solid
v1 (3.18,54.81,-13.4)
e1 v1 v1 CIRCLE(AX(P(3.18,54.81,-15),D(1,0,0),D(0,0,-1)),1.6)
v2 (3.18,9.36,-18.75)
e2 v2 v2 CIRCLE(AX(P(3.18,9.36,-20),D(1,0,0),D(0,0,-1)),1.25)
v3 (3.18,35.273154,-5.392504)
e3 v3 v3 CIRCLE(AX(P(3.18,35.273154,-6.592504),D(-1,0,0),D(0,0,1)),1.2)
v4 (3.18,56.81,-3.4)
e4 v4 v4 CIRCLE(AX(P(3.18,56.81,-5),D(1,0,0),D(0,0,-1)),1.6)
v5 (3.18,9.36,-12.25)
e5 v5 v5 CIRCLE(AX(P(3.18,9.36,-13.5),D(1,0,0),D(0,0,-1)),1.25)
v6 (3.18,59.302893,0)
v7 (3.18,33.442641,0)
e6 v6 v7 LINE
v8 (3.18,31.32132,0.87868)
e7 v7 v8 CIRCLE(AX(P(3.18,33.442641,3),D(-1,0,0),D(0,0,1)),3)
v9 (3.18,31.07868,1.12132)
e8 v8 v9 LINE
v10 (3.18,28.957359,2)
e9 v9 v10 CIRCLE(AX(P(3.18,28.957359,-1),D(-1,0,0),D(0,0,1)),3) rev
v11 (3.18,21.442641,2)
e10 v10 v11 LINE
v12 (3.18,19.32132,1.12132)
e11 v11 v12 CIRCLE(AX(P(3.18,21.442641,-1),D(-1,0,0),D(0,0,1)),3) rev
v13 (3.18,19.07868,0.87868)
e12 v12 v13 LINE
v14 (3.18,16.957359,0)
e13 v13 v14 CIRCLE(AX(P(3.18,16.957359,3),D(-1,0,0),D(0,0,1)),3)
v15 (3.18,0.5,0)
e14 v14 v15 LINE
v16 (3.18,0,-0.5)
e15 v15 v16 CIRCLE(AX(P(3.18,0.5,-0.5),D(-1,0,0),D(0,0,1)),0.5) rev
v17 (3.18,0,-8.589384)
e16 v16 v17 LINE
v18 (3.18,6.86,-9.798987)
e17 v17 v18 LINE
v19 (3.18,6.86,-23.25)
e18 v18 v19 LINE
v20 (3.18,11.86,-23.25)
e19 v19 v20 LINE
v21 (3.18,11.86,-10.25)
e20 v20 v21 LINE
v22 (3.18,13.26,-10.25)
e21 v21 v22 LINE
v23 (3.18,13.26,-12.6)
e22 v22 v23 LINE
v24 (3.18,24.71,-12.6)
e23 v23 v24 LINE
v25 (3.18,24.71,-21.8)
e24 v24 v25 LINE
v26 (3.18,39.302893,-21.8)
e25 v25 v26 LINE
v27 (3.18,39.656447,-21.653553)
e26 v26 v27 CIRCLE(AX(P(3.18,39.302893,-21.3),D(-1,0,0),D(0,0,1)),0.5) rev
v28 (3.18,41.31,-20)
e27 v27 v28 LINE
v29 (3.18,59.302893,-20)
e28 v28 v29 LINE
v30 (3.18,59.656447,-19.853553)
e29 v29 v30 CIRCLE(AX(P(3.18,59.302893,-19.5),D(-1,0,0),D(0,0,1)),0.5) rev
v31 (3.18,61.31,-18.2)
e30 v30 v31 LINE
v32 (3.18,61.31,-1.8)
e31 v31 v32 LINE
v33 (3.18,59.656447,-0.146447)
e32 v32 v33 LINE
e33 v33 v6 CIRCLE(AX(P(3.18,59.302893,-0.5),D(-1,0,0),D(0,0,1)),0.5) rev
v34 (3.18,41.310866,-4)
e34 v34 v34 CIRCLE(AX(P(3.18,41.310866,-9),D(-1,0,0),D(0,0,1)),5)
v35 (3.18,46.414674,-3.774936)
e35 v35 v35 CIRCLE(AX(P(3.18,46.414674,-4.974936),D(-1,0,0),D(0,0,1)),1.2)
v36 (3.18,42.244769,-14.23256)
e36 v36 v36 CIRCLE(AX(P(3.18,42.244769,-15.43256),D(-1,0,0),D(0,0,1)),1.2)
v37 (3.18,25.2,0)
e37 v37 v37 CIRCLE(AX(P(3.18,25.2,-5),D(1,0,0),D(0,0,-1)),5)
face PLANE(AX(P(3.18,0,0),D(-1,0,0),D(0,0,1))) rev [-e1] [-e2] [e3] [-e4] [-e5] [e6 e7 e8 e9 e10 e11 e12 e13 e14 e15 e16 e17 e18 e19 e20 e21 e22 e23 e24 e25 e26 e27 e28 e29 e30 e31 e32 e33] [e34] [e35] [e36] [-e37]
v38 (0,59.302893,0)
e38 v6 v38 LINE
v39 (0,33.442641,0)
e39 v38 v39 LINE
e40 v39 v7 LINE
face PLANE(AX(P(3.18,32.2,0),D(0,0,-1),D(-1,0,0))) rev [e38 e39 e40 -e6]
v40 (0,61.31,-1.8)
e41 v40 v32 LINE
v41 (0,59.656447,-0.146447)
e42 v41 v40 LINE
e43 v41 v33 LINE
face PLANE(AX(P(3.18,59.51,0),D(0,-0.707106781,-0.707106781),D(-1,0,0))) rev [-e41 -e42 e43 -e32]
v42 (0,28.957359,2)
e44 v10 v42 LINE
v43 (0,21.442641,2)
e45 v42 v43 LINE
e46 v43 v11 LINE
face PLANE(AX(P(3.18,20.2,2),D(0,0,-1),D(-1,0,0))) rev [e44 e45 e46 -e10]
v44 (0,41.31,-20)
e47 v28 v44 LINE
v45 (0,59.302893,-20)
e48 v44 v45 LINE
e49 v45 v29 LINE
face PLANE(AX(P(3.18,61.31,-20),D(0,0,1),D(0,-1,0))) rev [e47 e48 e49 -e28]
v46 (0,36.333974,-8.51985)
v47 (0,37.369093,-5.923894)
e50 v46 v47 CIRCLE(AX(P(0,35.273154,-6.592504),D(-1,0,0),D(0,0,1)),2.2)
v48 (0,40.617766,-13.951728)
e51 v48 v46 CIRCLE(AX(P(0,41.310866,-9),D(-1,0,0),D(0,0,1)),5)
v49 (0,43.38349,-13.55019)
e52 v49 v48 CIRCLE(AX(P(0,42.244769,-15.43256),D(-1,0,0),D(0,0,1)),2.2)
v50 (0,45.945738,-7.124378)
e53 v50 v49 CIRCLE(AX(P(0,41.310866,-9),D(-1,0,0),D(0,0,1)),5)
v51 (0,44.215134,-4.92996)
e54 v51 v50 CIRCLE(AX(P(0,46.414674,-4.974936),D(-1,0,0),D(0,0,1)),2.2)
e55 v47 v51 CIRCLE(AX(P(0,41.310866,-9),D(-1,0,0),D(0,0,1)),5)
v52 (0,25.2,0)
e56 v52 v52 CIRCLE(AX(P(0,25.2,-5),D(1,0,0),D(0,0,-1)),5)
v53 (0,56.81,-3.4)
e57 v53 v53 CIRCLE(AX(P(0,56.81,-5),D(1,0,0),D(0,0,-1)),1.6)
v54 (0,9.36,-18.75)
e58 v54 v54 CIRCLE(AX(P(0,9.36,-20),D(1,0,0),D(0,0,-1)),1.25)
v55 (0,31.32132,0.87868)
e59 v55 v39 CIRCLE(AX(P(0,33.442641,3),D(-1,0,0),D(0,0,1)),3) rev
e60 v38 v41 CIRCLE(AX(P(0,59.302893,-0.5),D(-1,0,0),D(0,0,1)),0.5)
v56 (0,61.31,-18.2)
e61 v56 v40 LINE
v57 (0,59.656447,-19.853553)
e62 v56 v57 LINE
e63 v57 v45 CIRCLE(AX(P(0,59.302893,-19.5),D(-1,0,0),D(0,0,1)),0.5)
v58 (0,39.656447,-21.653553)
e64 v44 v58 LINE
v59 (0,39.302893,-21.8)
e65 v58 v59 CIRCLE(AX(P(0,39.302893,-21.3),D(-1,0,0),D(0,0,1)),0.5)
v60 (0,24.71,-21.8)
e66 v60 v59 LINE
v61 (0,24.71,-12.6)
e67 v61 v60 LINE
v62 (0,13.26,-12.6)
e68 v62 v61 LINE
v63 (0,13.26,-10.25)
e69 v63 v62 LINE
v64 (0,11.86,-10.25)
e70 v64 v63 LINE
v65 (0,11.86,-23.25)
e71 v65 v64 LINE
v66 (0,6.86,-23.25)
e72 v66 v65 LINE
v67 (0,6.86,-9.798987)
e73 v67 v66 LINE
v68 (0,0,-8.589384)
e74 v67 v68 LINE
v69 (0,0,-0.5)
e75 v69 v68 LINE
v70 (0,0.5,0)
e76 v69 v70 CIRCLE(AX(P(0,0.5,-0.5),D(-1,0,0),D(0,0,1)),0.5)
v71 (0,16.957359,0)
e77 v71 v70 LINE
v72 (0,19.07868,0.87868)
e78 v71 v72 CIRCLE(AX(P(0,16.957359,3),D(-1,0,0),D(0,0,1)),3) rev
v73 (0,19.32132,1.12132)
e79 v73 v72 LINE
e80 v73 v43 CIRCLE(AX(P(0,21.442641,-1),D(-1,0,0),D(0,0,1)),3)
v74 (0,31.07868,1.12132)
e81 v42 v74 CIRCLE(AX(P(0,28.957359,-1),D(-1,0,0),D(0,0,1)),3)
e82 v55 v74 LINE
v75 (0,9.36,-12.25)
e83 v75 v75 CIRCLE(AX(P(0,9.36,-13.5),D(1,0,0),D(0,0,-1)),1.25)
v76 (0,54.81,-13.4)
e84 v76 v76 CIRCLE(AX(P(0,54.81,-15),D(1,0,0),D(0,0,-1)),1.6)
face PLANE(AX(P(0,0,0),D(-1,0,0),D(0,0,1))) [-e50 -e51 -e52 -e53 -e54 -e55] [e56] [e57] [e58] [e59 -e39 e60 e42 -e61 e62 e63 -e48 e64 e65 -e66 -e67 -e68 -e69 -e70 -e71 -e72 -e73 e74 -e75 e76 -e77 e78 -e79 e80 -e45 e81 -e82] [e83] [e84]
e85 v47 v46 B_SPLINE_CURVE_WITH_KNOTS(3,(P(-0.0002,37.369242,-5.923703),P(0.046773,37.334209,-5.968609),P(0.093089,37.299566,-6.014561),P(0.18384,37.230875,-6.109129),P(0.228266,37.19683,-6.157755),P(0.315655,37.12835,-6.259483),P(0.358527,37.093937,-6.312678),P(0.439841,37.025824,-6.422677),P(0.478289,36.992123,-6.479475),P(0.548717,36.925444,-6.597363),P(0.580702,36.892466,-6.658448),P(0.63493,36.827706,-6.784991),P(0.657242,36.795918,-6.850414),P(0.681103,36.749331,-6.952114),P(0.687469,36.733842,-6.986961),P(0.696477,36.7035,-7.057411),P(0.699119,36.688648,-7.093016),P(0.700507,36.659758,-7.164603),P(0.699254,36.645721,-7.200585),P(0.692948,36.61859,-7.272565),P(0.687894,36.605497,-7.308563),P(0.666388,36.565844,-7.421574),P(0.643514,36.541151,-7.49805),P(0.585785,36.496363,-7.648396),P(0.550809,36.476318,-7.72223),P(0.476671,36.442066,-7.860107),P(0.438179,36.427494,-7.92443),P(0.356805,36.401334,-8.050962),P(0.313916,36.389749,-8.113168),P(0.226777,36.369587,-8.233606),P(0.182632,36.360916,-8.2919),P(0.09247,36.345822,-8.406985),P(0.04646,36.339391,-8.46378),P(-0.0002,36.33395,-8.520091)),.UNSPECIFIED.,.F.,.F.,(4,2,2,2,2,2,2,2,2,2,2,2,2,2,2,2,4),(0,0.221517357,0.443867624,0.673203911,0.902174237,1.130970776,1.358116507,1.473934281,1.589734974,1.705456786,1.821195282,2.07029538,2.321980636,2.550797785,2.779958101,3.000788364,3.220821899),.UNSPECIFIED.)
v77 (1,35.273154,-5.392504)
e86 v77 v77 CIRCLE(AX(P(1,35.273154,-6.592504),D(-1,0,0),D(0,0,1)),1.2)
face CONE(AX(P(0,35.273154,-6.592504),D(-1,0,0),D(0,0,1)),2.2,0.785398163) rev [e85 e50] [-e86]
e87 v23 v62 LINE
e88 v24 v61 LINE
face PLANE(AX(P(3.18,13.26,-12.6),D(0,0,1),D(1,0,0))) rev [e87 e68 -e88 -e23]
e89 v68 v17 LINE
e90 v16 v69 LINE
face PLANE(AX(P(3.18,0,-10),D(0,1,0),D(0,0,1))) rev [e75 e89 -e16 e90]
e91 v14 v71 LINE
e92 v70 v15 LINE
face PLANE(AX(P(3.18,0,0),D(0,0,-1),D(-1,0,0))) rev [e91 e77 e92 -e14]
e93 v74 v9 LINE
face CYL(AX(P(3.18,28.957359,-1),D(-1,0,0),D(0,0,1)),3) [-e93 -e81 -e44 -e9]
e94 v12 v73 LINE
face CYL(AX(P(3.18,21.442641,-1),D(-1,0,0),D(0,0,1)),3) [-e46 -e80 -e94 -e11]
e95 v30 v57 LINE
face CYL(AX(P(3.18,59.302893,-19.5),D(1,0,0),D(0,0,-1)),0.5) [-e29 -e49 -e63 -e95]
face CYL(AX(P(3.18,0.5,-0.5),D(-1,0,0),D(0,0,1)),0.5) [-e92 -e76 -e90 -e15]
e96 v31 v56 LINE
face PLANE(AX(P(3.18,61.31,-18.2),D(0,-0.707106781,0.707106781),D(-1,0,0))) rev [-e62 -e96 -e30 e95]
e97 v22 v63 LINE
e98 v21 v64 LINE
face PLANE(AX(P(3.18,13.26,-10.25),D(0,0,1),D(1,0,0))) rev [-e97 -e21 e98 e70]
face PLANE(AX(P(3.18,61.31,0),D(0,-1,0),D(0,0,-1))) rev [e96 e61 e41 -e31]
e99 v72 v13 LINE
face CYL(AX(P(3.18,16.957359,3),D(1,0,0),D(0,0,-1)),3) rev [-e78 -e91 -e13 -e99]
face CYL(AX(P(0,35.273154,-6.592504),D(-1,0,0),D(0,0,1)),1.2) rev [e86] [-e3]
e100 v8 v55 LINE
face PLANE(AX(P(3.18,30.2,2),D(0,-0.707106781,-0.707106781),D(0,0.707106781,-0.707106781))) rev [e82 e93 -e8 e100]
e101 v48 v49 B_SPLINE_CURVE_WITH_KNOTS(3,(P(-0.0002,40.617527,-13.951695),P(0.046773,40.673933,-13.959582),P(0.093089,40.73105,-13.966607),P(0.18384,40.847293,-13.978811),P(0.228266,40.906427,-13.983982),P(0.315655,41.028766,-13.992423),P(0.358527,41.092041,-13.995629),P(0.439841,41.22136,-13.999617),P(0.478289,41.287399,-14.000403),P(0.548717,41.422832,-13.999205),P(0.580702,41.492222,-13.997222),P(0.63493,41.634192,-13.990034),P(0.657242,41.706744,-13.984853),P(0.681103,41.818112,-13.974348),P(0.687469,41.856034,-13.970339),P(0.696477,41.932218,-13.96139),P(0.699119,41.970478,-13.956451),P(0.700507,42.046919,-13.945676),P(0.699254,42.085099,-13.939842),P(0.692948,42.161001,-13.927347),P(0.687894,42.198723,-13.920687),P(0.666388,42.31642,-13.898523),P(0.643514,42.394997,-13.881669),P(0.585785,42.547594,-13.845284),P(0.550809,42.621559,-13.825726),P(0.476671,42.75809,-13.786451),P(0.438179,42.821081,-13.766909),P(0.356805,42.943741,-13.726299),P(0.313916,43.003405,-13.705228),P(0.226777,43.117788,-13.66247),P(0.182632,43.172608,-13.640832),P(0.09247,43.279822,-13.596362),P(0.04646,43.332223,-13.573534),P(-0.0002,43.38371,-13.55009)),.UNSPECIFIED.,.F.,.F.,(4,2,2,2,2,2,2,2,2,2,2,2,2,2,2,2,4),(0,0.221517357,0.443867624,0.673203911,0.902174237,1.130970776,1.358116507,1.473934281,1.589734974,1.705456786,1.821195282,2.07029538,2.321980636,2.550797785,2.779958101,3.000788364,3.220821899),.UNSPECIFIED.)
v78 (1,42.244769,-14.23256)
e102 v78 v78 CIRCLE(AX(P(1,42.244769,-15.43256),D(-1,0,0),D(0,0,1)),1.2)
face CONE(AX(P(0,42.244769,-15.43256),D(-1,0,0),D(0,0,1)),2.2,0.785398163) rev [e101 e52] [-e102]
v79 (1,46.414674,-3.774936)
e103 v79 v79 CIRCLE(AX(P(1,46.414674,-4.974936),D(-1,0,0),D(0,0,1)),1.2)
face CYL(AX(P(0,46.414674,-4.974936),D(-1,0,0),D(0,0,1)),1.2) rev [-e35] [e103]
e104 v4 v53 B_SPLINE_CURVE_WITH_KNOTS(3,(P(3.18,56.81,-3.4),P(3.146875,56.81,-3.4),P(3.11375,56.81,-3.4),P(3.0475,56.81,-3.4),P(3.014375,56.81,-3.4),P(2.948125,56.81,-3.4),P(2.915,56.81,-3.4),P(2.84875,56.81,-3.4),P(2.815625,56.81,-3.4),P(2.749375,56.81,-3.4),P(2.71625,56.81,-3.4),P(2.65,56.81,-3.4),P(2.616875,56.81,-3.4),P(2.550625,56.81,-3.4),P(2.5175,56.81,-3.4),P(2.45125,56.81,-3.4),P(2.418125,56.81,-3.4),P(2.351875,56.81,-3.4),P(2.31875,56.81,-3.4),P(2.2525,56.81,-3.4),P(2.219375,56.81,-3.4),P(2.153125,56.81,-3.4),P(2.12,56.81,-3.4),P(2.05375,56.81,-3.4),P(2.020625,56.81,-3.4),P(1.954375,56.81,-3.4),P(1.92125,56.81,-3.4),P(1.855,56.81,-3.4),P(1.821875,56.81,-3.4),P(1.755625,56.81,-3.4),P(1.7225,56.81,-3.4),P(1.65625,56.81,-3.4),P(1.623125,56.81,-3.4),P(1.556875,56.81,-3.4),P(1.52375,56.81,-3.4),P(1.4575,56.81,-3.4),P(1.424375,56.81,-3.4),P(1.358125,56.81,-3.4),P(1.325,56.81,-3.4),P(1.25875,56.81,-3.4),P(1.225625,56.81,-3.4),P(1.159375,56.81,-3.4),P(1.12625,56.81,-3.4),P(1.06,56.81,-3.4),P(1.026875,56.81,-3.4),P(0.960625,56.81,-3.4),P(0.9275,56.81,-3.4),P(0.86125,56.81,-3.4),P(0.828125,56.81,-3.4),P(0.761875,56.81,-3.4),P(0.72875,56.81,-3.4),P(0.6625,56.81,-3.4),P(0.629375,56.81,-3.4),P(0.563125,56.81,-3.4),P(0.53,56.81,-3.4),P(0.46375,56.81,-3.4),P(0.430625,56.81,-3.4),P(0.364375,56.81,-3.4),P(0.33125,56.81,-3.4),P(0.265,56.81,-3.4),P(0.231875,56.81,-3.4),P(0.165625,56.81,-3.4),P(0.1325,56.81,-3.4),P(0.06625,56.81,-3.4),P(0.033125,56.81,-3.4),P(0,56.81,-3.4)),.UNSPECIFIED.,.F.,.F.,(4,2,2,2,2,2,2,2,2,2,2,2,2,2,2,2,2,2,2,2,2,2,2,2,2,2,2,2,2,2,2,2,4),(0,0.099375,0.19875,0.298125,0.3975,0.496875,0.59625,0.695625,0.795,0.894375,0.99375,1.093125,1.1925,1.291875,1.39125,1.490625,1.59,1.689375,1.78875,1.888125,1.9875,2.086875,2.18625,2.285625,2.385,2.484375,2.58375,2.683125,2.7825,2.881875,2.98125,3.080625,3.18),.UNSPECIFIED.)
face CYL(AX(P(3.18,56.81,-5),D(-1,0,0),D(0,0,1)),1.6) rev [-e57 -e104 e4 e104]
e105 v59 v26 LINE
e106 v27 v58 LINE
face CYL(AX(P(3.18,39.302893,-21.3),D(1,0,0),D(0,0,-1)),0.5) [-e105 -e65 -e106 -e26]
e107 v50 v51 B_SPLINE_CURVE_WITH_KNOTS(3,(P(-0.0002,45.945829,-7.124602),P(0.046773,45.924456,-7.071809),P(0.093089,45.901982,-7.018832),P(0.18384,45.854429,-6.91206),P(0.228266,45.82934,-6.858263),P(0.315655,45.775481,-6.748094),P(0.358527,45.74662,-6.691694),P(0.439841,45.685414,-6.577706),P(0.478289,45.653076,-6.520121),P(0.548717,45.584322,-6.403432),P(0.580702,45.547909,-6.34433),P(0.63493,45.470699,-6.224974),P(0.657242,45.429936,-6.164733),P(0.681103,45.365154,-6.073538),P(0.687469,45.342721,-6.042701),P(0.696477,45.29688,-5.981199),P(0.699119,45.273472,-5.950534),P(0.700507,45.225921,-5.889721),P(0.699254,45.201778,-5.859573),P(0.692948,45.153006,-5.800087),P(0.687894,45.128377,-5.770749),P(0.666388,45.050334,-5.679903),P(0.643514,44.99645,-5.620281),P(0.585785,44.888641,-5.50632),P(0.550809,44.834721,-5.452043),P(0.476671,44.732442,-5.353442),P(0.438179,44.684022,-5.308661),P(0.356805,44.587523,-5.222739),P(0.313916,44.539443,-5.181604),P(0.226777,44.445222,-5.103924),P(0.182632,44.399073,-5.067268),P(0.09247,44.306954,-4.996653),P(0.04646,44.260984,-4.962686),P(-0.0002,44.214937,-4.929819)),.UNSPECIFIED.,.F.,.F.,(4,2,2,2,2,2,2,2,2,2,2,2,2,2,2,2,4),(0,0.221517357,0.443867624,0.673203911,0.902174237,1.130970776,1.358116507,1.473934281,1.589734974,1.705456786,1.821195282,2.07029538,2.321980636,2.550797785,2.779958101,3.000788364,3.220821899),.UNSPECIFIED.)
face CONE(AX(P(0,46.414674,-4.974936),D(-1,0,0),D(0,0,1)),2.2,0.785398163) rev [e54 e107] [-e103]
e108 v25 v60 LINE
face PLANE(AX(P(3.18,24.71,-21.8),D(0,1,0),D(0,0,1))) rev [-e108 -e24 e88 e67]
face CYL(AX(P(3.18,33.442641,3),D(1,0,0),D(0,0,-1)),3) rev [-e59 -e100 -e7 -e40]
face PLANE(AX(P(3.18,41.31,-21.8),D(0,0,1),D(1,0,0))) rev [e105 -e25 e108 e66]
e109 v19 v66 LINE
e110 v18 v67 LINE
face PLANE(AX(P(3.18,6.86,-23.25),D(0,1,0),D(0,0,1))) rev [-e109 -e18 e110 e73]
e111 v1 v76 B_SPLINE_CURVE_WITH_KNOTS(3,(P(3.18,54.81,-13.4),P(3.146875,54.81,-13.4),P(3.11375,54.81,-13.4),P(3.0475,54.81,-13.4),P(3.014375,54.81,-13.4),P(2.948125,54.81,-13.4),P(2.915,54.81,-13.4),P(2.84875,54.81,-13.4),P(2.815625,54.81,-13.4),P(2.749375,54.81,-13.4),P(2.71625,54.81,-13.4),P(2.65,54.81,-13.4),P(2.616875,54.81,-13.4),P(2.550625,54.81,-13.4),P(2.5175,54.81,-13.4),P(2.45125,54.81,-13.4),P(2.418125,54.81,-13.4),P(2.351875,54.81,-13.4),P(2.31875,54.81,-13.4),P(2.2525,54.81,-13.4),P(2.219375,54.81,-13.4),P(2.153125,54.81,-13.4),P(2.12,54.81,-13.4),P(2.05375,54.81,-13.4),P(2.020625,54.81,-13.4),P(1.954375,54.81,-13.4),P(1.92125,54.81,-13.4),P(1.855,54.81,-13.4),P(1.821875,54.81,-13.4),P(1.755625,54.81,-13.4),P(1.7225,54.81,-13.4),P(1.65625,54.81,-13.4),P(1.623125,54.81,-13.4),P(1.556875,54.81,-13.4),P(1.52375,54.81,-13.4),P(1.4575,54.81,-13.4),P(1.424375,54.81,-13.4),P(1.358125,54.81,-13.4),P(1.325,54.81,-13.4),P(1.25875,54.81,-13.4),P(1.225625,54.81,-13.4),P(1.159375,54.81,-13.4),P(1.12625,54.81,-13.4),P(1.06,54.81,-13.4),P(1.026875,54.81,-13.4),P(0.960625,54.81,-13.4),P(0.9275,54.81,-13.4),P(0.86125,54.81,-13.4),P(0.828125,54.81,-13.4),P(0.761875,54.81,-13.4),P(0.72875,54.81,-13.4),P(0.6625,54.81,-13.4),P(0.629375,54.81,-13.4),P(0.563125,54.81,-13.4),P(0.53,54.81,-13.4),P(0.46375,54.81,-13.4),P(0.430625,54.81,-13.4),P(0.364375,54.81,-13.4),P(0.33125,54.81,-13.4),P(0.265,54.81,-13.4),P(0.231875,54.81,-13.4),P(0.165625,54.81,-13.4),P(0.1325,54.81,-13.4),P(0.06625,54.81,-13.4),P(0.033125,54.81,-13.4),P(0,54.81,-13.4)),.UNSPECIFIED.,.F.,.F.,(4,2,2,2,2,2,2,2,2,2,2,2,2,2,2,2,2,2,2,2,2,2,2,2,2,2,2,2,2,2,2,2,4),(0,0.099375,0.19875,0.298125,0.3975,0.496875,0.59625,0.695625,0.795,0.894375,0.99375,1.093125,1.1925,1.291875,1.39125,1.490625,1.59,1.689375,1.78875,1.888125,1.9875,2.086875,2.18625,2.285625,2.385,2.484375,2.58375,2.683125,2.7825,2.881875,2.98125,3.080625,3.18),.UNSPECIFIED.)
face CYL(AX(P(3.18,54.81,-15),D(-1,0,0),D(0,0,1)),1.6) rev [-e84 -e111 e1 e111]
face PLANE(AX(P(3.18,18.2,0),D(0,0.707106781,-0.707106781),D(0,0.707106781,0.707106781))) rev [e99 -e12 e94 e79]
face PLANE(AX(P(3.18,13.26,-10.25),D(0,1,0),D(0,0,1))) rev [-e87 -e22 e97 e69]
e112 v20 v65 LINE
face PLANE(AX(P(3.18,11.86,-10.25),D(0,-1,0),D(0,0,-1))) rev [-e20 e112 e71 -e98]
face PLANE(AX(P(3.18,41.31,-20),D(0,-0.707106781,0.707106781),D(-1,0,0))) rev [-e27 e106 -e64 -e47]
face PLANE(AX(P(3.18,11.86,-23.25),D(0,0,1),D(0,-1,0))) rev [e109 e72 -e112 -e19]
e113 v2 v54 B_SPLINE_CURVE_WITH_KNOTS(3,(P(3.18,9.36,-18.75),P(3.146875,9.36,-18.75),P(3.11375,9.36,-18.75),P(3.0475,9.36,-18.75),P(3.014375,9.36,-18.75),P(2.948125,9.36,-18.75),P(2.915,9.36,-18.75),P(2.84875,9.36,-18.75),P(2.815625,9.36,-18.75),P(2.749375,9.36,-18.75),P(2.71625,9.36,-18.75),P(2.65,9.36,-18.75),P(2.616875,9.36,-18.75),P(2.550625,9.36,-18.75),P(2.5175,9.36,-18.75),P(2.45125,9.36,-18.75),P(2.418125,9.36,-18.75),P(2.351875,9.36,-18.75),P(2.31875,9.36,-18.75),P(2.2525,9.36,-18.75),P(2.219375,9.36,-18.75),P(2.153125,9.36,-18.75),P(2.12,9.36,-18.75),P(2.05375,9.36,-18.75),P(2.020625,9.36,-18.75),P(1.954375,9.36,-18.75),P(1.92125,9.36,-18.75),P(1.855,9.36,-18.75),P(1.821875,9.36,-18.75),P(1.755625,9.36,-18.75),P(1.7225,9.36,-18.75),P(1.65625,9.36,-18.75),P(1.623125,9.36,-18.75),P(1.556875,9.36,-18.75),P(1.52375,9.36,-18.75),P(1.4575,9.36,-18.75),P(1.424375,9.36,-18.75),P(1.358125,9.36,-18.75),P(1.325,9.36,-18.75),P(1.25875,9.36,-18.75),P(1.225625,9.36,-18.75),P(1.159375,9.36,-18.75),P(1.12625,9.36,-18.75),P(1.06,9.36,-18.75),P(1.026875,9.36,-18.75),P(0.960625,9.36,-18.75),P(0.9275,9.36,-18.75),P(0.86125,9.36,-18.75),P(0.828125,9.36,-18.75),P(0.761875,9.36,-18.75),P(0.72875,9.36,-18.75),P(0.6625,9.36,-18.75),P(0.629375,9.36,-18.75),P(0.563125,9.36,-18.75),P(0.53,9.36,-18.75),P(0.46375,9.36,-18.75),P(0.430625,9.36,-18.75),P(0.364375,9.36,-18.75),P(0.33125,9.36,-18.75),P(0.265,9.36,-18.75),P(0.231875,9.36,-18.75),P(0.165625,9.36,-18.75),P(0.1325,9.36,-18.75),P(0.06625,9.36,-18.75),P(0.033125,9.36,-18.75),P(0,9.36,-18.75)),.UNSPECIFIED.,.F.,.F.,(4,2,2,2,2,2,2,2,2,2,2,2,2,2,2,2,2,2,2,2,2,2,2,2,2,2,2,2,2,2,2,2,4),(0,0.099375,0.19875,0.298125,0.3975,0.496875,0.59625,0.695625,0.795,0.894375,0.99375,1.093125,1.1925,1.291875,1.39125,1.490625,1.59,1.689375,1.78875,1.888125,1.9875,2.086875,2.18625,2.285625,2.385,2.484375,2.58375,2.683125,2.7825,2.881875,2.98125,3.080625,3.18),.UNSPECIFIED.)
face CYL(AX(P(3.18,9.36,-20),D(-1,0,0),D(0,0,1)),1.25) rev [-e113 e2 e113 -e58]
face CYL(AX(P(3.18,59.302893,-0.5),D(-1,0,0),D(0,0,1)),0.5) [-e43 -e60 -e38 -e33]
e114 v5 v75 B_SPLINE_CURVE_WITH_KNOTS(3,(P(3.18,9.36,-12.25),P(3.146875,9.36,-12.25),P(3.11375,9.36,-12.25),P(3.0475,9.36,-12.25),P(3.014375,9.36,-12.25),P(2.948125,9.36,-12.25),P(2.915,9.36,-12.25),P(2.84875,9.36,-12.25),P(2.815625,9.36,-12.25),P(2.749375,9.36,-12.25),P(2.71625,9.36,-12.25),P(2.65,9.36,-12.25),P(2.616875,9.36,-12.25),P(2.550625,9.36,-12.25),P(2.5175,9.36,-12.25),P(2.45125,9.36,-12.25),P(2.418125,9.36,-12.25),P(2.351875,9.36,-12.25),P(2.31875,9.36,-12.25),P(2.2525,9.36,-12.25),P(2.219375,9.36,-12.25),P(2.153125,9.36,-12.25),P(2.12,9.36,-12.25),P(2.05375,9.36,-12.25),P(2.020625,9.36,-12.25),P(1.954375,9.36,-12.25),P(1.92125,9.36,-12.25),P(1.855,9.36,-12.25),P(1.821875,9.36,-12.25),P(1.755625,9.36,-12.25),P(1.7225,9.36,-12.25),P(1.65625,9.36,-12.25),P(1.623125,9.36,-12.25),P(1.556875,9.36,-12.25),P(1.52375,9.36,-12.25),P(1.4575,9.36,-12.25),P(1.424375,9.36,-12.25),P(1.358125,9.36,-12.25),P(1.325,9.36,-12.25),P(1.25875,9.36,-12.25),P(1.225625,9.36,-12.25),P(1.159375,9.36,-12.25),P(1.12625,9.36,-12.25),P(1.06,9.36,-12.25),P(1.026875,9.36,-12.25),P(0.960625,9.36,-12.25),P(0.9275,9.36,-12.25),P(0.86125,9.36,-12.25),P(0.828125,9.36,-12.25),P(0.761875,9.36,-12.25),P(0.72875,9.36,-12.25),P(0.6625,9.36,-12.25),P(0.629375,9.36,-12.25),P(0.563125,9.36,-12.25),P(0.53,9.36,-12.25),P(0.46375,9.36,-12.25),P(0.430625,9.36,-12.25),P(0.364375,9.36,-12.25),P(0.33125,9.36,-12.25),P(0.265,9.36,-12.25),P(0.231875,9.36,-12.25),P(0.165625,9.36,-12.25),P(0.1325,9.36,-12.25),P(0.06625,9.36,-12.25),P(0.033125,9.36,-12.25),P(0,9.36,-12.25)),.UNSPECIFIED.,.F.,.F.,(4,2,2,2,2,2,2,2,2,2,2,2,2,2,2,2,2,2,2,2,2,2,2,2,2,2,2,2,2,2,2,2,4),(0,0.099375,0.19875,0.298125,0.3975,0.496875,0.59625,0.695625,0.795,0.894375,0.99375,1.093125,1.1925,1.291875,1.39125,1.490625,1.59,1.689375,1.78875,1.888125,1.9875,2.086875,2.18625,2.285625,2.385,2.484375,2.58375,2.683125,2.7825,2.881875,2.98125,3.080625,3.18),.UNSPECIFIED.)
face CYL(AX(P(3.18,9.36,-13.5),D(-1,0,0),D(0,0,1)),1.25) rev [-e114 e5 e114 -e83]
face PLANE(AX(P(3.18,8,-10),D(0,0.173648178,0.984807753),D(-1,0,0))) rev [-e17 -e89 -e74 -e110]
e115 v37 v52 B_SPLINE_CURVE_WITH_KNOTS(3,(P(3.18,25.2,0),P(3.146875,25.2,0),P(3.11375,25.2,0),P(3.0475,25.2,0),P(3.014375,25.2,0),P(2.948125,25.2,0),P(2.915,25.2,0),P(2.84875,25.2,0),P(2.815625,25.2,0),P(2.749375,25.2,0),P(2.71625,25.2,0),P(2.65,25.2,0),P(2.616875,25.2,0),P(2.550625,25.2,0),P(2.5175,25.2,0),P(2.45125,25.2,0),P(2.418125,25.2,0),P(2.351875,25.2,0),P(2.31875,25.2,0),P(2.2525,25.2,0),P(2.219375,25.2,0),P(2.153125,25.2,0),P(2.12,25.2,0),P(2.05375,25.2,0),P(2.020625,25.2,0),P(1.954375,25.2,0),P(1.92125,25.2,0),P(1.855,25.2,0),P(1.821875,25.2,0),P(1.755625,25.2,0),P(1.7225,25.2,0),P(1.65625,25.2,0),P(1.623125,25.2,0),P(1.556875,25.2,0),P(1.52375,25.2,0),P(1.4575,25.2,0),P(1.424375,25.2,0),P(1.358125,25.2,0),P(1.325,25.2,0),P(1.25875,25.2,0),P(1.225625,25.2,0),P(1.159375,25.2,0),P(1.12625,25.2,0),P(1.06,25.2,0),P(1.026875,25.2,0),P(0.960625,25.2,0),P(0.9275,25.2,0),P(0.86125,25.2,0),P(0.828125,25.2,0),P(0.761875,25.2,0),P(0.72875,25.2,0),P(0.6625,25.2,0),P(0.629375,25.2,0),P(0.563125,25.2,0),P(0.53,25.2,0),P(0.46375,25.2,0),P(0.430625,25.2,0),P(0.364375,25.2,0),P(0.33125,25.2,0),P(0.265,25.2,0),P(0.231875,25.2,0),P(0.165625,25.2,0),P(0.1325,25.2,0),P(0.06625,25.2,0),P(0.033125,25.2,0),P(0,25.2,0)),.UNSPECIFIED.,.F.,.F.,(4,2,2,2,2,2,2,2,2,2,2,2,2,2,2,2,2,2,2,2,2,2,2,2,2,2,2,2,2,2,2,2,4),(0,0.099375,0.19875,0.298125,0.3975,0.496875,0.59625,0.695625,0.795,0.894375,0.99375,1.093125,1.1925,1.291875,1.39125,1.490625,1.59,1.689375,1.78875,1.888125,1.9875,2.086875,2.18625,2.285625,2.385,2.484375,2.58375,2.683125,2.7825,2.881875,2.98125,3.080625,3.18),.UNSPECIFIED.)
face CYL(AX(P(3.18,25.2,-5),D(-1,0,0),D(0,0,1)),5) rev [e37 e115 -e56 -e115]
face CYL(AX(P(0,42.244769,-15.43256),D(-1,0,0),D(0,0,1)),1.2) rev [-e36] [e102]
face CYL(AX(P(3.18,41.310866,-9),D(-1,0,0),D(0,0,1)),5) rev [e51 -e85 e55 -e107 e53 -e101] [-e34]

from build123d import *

# Parameters (mm, degrees)
SKETCH1_R                                       = 5
SKETCH1_R_2                                     = 1.6
SKETCH1_R_3                                     = 1.25
BOSS_EXTRUDE1_DEPTH                             = 3.18
CHAMFER1_SIZE                                   = 8
CHAMFER1_SIZE_2                                 = 1.410615846
CSK_FOR_M2_FLAT_HEAD_MACHINE_SCREW1_D           = 2.4
CSK_FOR_M2_FLAT_HEAD_MACHINE_SCREW1_DEPTH       = 3.508967257
CSK_FOR_M2_FLAT_HEAD_MACHINE_SCREW1_CSINK_D     = 4.4
CSK_FOR_M2_FLAT_HEAD_MACHINE_SCREW1_CSINK_ANGLE = 90
CSK_FOR_M2_FLAT_HEAD_MACHINE_SCREW1_TIP         = 0.721032743
SKETCH3_R                                       = 5
CUT_EXTRUDE4_DEPTH                              = 66.647475199
FILLET2_R                                       = 3
CHAMFER2_SIZE                                   = 1.8
FILLET4_R                                       = 0.5


# Some blends are built 0.0001 mm under size
with BuildPart() as part:
    # Sketch1 → Boss-Extrude1 (new body)
    with BuildSketch(Plane(origin=(0, 0, 0), x_dir=(0, 0, -1), z_dir=(1, 0, 0))):
        Polygon((0, 0), (0, 18.2), (-2, 20.2), (-2, 30.2), (0, 32.2), (0, 61.31), (20, 61.31), (20, 41.31), (21.8, 41.31), (21.8, 24.71), (12.6, 24.71), (12.6, 13.26), (10.25, 13.26), (10.25, 11.86), (23.25, 11.86), (23.25, 6.86), (10, 6.86), (10, 0), align=None)
        with Locations(Location((5, 25.2, 0), (0, 0, 180))):
            Circle(SKETCH1_R, mode=Mode.SUBTRACT)
        with Locations(Location((5, 56.81, 0), (0, 0, 180))):
            Circle(SKETCH1_R_2, mode=Mode.SUBTRACT)
        with Locations(Location((15, 54.81, 0), (0, 0, 180))):
            Circle(SKETCH1_R_2, mode=Mode.SUBTRACT)
        with Locations(Location((20, 9.36, 0), (0, 0, 180))):
            Circle(SKETCH1_R_3, mode=Mode.SUBTRACT)
        with Locations(Location((13.5, 9.36, 0), (0, 0, 180))):
            Circle(SKETCH1_R_3, mode=Mode.SUBTRACT)
    extrude(amount=BOSS_EXTRUDE1_DEPTH)

    # Chamfer1
    # the kernel refuses this chamfer: 8, 1.410615846 mm, written as the material it takes off along each edge
    with BuildSketch(Plane(origin=(-20.788310371, 0, -10), x_dir=(0, 0.9999776716360547, -0.006682531656101032), z_dir=(1, 0, 0))) as chamfer1_piece_1_section:
        Polygon((CHAMFER1_SIZE * 0.999977671636, CHAMFER1_SIZE * 0.0066825316561), (-CHAMFER1_SIZE_2 * 0.00668253165453, CHAMFER1_SIZE_2 * 0.999977671401), (0, 0), align=None)
    chamfer1_piece_1 = extrude(amount=44.756620743, mode=Mode.PRIVATE)
    chamfer1_piece_1 = split(chamfer1_piece_1, bisect_by=Plane(origin=(1.59, 6.86, -9.594110318), z_dir=(0, -1, 0)), keep=Keep.TOP, mode=Mode.PRIVATE)
    add(chamfer1_piece_1, mode=Mode.SUBTRACT)

    # CSK for M2 Flat Head Machine Screw1
    with Locations(Plane.ZY):
        with Locations((-4.974936087, 46.414674329), (-15.432559713, 42.244769284), (-6.592504199, 35.273154083)):
            CounterSinkHole(CSK_FOR_M2_FLAT_HEAD_MACHINE_SCREW1_D / 2, CSK_FOR_M2_FLAT_HEAD_MACHINE_SCREW1_CSINK_D / 2, depth=CSK_FOR_M2_FLAT_HEAD_MACHINE_SCREW1_DEPTH, counter_sink_angle=CSK_FOR_M2_FLAT_HEAD_MACHINE_SCREW1_CSINK_ANGLE)
            with Locations((0, 0, -(CSK_FOR_M2_FLAT_HEAD_MACHINE_SCREW1_DEPTH + CSK_FOR_M2_FLAT_HEAD_MACHINE_SCREW1_TIP / 2))):  # 118° drill point
                Cone(0, CSK_FOR_M2_FLAT_HEAD_MACHINE_SCREW1_D / 2, CSK_FOR_M2_FLAT_HEAD_MACHINE_SCREW1_TIP, mode=Mode.SUBTRACT)

    # Sketch3 → Cut-Extrude4 (cut, through all)
    with BuildSketch(Plane.ZY):
        with Locations((-9, 41.310865899)):
            Circle(SKETCH3_R)
    extrude(amount=-CUT_EXTRUDE4_DEPTH, mode=Mode.SUBTRACT)

    # Fillet2
    fillet2_edges = [part.edges().sort_by_distance(p)[0] for p in [
        (1.59, 18.2, 0),
        (1.59, 20.2, 2),
        (1.59, 30.2, 2),
        (1.59, 32.2, 0),
    ]]
    fillet(fillet2_edges, radius=FILLET2_R)

    # Chamfer2
    chamfer2_edges = [part.edges().sort_by_distance(p)[0] for p in [
        (1.59, 61.31, -20),
        (1.59, 61.31, 0),
        (1.59, 41.31, -21.8),
    ]]
    chamfer(chamfer2_edges, length=CHAMFER2_SIZE - 0.0001)  # a hair under: the kernel refuses the full size

    # Fillet4
    fillet4_edges = [part.edges().sort_by_distance(p)[0] for p in [
        (1.59, 39.5101, -21.8),
        (1.59, 59.5101, -20),
        (1.59, 59.5101, 0),
        (1.59, 0, 0),
    ]]
    fillet(fillet4_edges, radius=FILLET4_R)


solid = part.part
